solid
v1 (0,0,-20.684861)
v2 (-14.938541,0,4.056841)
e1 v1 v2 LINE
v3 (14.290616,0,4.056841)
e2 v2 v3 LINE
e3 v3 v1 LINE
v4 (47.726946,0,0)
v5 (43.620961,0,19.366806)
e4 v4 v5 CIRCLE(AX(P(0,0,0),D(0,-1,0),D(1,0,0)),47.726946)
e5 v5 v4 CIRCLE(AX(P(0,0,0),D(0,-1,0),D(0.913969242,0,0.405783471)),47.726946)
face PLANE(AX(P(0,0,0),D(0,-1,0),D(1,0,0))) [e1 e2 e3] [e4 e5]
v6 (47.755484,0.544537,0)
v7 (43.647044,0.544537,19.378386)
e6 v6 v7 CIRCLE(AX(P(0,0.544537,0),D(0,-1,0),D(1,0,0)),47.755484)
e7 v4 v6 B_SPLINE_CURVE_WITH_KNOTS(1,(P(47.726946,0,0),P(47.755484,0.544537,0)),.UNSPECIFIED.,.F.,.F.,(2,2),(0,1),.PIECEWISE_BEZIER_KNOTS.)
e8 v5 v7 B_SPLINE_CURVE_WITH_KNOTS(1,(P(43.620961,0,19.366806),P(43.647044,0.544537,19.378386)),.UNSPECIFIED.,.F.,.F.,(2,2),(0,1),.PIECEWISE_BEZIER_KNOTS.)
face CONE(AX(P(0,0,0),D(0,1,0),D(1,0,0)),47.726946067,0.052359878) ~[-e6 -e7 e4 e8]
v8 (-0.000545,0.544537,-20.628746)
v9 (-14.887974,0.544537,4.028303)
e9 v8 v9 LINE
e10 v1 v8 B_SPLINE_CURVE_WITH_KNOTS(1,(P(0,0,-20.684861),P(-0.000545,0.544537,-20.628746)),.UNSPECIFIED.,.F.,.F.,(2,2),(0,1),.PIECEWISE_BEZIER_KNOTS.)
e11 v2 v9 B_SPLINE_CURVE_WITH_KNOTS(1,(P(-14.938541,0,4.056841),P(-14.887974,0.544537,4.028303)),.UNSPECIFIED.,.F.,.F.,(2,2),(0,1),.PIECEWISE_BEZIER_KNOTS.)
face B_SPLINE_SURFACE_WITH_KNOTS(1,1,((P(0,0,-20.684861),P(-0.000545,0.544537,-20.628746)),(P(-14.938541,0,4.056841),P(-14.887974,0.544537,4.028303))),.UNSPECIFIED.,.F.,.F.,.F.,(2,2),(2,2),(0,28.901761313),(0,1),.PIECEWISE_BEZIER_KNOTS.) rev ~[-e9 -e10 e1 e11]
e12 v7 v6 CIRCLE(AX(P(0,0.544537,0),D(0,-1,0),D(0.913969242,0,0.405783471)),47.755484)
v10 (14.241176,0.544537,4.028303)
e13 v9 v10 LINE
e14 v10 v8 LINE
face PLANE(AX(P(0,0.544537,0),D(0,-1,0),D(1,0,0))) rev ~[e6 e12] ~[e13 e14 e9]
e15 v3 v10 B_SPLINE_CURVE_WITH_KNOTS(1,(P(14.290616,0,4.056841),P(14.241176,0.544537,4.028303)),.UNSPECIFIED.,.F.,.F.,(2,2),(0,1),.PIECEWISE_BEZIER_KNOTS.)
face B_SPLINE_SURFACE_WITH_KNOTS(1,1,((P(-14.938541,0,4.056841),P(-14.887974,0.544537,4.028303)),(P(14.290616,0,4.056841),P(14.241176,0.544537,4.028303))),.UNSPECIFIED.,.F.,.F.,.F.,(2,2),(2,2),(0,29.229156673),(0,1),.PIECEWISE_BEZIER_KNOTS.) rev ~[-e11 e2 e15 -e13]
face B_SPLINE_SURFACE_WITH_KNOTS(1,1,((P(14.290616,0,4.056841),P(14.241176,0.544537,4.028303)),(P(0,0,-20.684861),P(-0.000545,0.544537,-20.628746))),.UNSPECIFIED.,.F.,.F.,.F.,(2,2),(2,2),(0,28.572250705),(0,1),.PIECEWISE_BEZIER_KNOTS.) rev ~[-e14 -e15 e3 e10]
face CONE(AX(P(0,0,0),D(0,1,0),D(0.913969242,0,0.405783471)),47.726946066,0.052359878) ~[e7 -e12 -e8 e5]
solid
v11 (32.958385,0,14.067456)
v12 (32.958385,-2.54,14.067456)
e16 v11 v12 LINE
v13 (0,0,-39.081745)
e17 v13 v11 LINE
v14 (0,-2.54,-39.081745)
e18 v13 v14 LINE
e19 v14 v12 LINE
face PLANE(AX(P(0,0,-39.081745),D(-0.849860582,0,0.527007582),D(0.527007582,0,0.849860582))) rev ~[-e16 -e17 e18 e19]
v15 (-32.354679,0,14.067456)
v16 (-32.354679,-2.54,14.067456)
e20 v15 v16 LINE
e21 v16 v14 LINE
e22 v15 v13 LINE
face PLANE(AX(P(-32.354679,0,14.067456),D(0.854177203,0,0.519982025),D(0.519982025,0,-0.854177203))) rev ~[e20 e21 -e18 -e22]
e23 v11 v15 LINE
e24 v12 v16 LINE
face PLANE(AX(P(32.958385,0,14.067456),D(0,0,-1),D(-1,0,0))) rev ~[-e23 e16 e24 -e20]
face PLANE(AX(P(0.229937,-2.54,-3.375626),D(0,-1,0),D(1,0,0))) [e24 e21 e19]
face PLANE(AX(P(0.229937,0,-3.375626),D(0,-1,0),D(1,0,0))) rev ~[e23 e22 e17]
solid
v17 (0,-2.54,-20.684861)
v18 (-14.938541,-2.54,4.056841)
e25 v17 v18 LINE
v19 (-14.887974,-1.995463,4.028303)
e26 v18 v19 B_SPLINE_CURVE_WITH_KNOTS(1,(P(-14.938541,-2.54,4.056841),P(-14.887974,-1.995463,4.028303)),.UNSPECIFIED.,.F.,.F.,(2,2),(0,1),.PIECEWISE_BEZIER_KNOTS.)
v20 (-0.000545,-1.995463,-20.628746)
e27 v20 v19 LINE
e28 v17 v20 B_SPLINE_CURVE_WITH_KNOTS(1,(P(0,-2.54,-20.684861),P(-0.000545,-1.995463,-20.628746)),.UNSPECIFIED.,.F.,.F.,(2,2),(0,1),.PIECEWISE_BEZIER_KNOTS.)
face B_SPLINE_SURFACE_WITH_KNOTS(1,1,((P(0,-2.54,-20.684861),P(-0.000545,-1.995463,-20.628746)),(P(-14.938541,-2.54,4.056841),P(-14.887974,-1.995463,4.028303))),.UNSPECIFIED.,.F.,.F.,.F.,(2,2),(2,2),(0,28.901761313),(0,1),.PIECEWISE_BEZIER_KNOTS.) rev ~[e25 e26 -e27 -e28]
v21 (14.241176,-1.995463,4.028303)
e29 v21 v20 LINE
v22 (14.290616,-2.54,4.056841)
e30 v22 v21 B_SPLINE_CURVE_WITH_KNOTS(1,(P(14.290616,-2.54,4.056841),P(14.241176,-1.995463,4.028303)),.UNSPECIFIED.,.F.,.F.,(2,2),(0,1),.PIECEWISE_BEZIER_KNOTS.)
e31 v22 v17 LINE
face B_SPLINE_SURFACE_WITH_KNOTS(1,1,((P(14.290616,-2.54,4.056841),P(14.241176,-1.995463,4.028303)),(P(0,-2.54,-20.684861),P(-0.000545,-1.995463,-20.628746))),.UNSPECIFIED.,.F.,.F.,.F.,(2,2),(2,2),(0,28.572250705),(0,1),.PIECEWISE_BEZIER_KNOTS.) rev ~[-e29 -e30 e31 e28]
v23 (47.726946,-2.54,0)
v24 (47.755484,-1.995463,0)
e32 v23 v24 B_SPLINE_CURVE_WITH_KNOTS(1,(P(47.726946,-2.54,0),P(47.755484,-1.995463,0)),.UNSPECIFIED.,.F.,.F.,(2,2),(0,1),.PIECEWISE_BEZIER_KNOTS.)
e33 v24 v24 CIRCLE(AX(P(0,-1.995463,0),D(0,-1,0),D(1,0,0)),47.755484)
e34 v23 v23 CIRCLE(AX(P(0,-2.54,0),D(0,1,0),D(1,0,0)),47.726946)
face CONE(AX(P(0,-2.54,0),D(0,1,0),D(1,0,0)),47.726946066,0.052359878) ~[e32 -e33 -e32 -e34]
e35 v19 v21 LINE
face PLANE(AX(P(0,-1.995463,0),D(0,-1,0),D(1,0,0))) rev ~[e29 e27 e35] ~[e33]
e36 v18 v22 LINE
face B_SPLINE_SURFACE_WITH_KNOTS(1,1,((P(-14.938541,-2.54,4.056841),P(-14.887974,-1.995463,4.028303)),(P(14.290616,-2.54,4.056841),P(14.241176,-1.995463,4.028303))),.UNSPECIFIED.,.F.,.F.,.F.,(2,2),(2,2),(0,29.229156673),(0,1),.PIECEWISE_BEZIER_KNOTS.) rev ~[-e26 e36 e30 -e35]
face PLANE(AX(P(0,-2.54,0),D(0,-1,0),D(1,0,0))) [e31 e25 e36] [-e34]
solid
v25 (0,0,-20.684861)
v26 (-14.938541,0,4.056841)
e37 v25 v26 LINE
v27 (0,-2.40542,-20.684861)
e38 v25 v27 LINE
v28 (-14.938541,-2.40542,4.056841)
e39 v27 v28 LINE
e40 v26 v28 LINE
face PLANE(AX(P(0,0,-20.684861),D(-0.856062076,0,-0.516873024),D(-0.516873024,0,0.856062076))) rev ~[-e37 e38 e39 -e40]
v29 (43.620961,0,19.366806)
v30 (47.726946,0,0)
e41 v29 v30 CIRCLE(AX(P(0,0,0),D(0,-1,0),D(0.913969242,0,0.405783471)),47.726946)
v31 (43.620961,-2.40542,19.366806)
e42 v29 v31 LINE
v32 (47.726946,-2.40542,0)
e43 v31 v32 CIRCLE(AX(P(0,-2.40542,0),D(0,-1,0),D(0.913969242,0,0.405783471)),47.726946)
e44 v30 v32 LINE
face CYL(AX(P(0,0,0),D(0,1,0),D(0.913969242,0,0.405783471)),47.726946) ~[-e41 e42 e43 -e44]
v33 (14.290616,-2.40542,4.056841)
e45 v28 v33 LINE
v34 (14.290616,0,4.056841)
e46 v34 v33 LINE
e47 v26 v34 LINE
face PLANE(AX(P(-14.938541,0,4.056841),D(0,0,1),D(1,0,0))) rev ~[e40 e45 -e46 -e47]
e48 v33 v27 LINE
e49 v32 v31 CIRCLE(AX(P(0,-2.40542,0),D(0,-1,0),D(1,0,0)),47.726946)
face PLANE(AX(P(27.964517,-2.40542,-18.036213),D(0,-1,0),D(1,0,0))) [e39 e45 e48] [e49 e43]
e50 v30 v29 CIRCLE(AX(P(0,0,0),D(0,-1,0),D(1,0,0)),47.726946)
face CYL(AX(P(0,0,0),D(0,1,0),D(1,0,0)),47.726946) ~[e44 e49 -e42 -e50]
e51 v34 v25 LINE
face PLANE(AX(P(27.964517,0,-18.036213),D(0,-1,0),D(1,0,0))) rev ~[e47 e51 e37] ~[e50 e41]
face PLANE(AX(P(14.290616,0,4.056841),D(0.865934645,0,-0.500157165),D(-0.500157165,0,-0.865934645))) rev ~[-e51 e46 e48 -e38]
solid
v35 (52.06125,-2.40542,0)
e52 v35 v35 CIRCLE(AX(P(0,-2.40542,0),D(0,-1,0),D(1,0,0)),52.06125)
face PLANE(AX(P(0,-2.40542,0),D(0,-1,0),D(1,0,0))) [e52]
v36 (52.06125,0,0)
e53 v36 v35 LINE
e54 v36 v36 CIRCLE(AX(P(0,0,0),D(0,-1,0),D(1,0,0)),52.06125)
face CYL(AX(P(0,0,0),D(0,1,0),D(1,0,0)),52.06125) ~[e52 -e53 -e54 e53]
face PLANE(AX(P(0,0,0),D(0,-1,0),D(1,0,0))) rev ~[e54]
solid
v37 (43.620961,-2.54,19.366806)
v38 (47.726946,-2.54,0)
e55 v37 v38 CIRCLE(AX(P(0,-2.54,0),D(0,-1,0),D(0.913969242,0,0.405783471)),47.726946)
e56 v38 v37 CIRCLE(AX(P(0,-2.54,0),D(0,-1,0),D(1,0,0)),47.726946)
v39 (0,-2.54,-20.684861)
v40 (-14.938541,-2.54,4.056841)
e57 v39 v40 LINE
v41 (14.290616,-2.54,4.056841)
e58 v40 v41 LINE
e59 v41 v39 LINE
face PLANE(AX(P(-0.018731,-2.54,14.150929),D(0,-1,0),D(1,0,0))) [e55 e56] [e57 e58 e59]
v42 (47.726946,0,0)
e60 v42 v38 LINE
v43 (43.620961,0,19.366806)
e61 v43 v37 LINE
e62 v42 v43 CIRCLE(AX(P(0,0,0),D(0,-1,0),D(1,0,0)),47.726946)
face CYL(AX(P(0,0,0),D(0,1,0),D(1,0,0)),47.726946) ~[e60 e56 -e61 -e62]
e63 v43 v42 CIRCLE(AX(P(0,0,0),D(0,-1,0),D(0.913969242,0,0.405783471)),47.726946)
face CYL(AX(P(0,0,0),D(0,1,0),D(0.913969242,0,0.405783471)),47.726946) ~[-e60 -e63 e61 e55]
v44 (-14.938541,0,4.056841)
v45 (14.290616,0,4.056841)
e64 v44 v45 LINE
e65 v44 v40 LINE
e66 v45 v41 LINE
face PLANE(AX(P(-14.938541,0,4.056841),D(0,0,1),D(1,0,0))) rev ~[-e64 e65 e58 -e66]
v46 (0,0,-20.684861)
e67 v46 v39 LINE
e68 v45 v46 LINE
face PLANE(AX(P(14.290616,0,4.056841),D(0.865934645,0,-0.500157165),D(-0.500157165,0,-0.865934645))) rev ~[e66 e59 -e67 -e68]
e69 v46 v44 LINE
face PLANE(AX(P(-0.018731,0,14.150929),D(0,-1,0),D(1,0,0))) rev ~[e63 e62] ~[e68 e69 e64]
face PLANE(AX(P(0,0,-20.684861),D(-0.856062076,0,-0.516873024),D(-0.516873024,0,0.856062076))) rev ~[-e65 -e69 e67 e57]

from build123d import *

# Parameters (mm, degrees)
F3_DEPTH  = 2.54
F1_R      = 52.0612504087
F4_DEPTH  = 2.4054199457
F3_FACE_R = 47.7269460656
F5_DEPTH  = 0.5445368588
F5_TAPER  = -3


with BuildPart() as f3:
    # F0 (on Front) → F3 (new body)
    with BuildSketch(Plane.XZ):
        Polygon((14.2906159163, 4.056841135), (43.6209606961, 19.3668058466), (-43.6209606961, 19.3668058466), (-14.9385407567, 4.056841135), align=None)
        with BuildLine():
            ThreePointArc((0, -47.7269460656), (33.7480472083, -33.7480472083), (47.7269460656, 0))
            ThreePointArc((47.7269460656, 0), (46.6891669406, 9.8986398631), (43.6209606961, 19.3668058466))
            Line((43.6209606961, 19.3668058466), (0, -47.7269460656))
        make_face()
        with BuildLine():
            Line((-43.6209606961, 19.3668058466), (43.6209606961, 19.3668058466))
            ThreePointArc((43.6209606961, 19.3668058466), (0, 47.7269460656), (-43.6209606961, 19.3668058466))
        make_face()
        Polygon((0, -47.7269460656), (43.6209606961, 19.3668058466), (14.2906159163, 4.056841135), (0, -20.6848606467), align=None)
        with BuildLine():
            ThreePointArc((-43.6209606961, 19.3668058466), (-40.0136219234, -26.01483118), (0, -47.7269460656))
            Line((0, -47.7269460656), (-43.6209606961, 19.3668058466))
        make_face()
        Polygon((-43.6209606961, 19.3668058466), (0, -47.7269460656), (0, -20.6848606467), (-14.9385407567, 4.056841135), align=None)
    extrude(amount=F3_DEPTH)


with BuildPart() as f3b:
    # F2 (on Front) → F3, piece 2 (new body)
    with BuildSketch(Plane.XZ):
        Polygon((-32.3546789587, 14.0674561262), (0, -39.0817448497), (32.9583846033, 14.0674561262), align=None)
    extrude(amount=F3_DEPTH)


with BuildPart() as f4:
    # F1 (on Front) → F4 (new body)
    with BuildSketch(Plane.XZ):
        Circle(F1_R)
    extrude(amount=F4_DEPTH)


with BuildPart() as f4b:
    # F0 (on Front) → F4, piece 2 (new body)
    with BuildSketch(Plane.XZ):
        with BuildLine():
            ThreePointArc((0, -47.7269460656), (33.7480472083, -33.7480472083), (47.7269460656, 0))
            ThreePointArc((47.7269460656, 0), (46.6891669406, 9.8986398631), (43.6209606961, 19.3668058466))
            Line((43.6209606961, 19.3668058466), (0, -47.7269460656))
        make_face()
        with BuildLine():
            Line((-43.6209606961, 19.3668058466), (43.6209606961, 19.3668058466))
            ThreePointArc((43.6209606961, 19.3668058466), (0, 47.7269460656), (-43.6209606961, 19.3668058466))
        make_face()
        Polygon((14.2906159163, 4.056841135), (43.6209606961, 19.3668058466), (-43.6209606961, 19.3668058466), (-14.9385407567, 4.056841135), align=None)
        Polygon((0, -47.7269460656), (43.6209606961, 19.3668058466), (14.2906159163, 4.056841135), (0, -20.6848606467), align=None)
        with BuildLine():
            ThreePointArc((-43.6209606961, 19.3668058466), (-40.0136219234, -26.01483118), (0, -47.7269460656))
            Line((0, -47.7269460656), (-43.6209606961, 19.3668058466))
        make_face()
        Polygon((-43.6209606961, 19.3668058466), (0, -47.7269460656), (0, -20.6848606467), (-14.9385407567, 4.056841135), align=None)
    extrude(amount=F4_DEPTH)


with BuildPart() as f5:
    # F0 (on Front) + F3_face (on face) → F5 (new body)
    with BuildSketch(Plane.XZ):
        with BuildLine():
            ThreePointArc((0, -47.7269460656), (33.7480472083, -33.7480472083), (47.7269460656, 0))
            ThreePointArc((47.7269460656, 0), (46.6891669406, 9.8986398631), (43.6209606961, 19.3668058466))
            Line((43.6209606961, 19.3668058466), (0, -47.7269460656))
        make_face()
        with BuildLine():
            Line((-43.6209606961, 19.3668058466), (43.6209606961, 19.3668058466))
            ThreePointArc((43.6209606961, 19.3668058466), (0, 47.7269460656), (-43.6209606961, 19.3668058466))
        make_face()
        Polygon((14.2906159163, 4.056841135), (43.6209606961, 19.3668058466), (-43.6209606961, 19.3668058466), (-14.9385407567, 4.056841135), align=None)
        Polygon((0, -47.7269460656), (43.6209606961, 19.3668058466), (14.2906159163, 4.056841135), (0, -20.6848606467), align=None)
        with BuildLine():
            ThreePointArc((-43.6209606961, 19.3668058466), (-40.0136219234, -26.01483118), (0, -47.7269460656))
            Line((0, -47.7269460656), (-43.6209606961, 19.3668058466))
        make_face()
        Polygon((-43.6209606961, 19.3668058466), (0, -47.7269460656), (0, -20.6848606467), (-14.9385407567, 4.056841135), align=None)
    with BuildSketch(Plane(origin=(0.0114937106, -2.54, 0.2230034674), x_dir=(1, 0, 0), z_dir=(0, -1, 0))):
        with Locations((-0.0114937106, -0.2230034674)):
            Circle(F3_FACE_R)
        Polygon((-14.9500344673, 3.8338376676), (14.2791222057, 3.8338376676), (-0.0114937106, -20.9078641141), align=None, mode=Mode.SUBTRACT)
    extrude(amount=-F5_DEPTH, taper=F5_TAPER)


solid = Compound([f3.part, f3b.part, f4.part, f4b.part, f5.part])
